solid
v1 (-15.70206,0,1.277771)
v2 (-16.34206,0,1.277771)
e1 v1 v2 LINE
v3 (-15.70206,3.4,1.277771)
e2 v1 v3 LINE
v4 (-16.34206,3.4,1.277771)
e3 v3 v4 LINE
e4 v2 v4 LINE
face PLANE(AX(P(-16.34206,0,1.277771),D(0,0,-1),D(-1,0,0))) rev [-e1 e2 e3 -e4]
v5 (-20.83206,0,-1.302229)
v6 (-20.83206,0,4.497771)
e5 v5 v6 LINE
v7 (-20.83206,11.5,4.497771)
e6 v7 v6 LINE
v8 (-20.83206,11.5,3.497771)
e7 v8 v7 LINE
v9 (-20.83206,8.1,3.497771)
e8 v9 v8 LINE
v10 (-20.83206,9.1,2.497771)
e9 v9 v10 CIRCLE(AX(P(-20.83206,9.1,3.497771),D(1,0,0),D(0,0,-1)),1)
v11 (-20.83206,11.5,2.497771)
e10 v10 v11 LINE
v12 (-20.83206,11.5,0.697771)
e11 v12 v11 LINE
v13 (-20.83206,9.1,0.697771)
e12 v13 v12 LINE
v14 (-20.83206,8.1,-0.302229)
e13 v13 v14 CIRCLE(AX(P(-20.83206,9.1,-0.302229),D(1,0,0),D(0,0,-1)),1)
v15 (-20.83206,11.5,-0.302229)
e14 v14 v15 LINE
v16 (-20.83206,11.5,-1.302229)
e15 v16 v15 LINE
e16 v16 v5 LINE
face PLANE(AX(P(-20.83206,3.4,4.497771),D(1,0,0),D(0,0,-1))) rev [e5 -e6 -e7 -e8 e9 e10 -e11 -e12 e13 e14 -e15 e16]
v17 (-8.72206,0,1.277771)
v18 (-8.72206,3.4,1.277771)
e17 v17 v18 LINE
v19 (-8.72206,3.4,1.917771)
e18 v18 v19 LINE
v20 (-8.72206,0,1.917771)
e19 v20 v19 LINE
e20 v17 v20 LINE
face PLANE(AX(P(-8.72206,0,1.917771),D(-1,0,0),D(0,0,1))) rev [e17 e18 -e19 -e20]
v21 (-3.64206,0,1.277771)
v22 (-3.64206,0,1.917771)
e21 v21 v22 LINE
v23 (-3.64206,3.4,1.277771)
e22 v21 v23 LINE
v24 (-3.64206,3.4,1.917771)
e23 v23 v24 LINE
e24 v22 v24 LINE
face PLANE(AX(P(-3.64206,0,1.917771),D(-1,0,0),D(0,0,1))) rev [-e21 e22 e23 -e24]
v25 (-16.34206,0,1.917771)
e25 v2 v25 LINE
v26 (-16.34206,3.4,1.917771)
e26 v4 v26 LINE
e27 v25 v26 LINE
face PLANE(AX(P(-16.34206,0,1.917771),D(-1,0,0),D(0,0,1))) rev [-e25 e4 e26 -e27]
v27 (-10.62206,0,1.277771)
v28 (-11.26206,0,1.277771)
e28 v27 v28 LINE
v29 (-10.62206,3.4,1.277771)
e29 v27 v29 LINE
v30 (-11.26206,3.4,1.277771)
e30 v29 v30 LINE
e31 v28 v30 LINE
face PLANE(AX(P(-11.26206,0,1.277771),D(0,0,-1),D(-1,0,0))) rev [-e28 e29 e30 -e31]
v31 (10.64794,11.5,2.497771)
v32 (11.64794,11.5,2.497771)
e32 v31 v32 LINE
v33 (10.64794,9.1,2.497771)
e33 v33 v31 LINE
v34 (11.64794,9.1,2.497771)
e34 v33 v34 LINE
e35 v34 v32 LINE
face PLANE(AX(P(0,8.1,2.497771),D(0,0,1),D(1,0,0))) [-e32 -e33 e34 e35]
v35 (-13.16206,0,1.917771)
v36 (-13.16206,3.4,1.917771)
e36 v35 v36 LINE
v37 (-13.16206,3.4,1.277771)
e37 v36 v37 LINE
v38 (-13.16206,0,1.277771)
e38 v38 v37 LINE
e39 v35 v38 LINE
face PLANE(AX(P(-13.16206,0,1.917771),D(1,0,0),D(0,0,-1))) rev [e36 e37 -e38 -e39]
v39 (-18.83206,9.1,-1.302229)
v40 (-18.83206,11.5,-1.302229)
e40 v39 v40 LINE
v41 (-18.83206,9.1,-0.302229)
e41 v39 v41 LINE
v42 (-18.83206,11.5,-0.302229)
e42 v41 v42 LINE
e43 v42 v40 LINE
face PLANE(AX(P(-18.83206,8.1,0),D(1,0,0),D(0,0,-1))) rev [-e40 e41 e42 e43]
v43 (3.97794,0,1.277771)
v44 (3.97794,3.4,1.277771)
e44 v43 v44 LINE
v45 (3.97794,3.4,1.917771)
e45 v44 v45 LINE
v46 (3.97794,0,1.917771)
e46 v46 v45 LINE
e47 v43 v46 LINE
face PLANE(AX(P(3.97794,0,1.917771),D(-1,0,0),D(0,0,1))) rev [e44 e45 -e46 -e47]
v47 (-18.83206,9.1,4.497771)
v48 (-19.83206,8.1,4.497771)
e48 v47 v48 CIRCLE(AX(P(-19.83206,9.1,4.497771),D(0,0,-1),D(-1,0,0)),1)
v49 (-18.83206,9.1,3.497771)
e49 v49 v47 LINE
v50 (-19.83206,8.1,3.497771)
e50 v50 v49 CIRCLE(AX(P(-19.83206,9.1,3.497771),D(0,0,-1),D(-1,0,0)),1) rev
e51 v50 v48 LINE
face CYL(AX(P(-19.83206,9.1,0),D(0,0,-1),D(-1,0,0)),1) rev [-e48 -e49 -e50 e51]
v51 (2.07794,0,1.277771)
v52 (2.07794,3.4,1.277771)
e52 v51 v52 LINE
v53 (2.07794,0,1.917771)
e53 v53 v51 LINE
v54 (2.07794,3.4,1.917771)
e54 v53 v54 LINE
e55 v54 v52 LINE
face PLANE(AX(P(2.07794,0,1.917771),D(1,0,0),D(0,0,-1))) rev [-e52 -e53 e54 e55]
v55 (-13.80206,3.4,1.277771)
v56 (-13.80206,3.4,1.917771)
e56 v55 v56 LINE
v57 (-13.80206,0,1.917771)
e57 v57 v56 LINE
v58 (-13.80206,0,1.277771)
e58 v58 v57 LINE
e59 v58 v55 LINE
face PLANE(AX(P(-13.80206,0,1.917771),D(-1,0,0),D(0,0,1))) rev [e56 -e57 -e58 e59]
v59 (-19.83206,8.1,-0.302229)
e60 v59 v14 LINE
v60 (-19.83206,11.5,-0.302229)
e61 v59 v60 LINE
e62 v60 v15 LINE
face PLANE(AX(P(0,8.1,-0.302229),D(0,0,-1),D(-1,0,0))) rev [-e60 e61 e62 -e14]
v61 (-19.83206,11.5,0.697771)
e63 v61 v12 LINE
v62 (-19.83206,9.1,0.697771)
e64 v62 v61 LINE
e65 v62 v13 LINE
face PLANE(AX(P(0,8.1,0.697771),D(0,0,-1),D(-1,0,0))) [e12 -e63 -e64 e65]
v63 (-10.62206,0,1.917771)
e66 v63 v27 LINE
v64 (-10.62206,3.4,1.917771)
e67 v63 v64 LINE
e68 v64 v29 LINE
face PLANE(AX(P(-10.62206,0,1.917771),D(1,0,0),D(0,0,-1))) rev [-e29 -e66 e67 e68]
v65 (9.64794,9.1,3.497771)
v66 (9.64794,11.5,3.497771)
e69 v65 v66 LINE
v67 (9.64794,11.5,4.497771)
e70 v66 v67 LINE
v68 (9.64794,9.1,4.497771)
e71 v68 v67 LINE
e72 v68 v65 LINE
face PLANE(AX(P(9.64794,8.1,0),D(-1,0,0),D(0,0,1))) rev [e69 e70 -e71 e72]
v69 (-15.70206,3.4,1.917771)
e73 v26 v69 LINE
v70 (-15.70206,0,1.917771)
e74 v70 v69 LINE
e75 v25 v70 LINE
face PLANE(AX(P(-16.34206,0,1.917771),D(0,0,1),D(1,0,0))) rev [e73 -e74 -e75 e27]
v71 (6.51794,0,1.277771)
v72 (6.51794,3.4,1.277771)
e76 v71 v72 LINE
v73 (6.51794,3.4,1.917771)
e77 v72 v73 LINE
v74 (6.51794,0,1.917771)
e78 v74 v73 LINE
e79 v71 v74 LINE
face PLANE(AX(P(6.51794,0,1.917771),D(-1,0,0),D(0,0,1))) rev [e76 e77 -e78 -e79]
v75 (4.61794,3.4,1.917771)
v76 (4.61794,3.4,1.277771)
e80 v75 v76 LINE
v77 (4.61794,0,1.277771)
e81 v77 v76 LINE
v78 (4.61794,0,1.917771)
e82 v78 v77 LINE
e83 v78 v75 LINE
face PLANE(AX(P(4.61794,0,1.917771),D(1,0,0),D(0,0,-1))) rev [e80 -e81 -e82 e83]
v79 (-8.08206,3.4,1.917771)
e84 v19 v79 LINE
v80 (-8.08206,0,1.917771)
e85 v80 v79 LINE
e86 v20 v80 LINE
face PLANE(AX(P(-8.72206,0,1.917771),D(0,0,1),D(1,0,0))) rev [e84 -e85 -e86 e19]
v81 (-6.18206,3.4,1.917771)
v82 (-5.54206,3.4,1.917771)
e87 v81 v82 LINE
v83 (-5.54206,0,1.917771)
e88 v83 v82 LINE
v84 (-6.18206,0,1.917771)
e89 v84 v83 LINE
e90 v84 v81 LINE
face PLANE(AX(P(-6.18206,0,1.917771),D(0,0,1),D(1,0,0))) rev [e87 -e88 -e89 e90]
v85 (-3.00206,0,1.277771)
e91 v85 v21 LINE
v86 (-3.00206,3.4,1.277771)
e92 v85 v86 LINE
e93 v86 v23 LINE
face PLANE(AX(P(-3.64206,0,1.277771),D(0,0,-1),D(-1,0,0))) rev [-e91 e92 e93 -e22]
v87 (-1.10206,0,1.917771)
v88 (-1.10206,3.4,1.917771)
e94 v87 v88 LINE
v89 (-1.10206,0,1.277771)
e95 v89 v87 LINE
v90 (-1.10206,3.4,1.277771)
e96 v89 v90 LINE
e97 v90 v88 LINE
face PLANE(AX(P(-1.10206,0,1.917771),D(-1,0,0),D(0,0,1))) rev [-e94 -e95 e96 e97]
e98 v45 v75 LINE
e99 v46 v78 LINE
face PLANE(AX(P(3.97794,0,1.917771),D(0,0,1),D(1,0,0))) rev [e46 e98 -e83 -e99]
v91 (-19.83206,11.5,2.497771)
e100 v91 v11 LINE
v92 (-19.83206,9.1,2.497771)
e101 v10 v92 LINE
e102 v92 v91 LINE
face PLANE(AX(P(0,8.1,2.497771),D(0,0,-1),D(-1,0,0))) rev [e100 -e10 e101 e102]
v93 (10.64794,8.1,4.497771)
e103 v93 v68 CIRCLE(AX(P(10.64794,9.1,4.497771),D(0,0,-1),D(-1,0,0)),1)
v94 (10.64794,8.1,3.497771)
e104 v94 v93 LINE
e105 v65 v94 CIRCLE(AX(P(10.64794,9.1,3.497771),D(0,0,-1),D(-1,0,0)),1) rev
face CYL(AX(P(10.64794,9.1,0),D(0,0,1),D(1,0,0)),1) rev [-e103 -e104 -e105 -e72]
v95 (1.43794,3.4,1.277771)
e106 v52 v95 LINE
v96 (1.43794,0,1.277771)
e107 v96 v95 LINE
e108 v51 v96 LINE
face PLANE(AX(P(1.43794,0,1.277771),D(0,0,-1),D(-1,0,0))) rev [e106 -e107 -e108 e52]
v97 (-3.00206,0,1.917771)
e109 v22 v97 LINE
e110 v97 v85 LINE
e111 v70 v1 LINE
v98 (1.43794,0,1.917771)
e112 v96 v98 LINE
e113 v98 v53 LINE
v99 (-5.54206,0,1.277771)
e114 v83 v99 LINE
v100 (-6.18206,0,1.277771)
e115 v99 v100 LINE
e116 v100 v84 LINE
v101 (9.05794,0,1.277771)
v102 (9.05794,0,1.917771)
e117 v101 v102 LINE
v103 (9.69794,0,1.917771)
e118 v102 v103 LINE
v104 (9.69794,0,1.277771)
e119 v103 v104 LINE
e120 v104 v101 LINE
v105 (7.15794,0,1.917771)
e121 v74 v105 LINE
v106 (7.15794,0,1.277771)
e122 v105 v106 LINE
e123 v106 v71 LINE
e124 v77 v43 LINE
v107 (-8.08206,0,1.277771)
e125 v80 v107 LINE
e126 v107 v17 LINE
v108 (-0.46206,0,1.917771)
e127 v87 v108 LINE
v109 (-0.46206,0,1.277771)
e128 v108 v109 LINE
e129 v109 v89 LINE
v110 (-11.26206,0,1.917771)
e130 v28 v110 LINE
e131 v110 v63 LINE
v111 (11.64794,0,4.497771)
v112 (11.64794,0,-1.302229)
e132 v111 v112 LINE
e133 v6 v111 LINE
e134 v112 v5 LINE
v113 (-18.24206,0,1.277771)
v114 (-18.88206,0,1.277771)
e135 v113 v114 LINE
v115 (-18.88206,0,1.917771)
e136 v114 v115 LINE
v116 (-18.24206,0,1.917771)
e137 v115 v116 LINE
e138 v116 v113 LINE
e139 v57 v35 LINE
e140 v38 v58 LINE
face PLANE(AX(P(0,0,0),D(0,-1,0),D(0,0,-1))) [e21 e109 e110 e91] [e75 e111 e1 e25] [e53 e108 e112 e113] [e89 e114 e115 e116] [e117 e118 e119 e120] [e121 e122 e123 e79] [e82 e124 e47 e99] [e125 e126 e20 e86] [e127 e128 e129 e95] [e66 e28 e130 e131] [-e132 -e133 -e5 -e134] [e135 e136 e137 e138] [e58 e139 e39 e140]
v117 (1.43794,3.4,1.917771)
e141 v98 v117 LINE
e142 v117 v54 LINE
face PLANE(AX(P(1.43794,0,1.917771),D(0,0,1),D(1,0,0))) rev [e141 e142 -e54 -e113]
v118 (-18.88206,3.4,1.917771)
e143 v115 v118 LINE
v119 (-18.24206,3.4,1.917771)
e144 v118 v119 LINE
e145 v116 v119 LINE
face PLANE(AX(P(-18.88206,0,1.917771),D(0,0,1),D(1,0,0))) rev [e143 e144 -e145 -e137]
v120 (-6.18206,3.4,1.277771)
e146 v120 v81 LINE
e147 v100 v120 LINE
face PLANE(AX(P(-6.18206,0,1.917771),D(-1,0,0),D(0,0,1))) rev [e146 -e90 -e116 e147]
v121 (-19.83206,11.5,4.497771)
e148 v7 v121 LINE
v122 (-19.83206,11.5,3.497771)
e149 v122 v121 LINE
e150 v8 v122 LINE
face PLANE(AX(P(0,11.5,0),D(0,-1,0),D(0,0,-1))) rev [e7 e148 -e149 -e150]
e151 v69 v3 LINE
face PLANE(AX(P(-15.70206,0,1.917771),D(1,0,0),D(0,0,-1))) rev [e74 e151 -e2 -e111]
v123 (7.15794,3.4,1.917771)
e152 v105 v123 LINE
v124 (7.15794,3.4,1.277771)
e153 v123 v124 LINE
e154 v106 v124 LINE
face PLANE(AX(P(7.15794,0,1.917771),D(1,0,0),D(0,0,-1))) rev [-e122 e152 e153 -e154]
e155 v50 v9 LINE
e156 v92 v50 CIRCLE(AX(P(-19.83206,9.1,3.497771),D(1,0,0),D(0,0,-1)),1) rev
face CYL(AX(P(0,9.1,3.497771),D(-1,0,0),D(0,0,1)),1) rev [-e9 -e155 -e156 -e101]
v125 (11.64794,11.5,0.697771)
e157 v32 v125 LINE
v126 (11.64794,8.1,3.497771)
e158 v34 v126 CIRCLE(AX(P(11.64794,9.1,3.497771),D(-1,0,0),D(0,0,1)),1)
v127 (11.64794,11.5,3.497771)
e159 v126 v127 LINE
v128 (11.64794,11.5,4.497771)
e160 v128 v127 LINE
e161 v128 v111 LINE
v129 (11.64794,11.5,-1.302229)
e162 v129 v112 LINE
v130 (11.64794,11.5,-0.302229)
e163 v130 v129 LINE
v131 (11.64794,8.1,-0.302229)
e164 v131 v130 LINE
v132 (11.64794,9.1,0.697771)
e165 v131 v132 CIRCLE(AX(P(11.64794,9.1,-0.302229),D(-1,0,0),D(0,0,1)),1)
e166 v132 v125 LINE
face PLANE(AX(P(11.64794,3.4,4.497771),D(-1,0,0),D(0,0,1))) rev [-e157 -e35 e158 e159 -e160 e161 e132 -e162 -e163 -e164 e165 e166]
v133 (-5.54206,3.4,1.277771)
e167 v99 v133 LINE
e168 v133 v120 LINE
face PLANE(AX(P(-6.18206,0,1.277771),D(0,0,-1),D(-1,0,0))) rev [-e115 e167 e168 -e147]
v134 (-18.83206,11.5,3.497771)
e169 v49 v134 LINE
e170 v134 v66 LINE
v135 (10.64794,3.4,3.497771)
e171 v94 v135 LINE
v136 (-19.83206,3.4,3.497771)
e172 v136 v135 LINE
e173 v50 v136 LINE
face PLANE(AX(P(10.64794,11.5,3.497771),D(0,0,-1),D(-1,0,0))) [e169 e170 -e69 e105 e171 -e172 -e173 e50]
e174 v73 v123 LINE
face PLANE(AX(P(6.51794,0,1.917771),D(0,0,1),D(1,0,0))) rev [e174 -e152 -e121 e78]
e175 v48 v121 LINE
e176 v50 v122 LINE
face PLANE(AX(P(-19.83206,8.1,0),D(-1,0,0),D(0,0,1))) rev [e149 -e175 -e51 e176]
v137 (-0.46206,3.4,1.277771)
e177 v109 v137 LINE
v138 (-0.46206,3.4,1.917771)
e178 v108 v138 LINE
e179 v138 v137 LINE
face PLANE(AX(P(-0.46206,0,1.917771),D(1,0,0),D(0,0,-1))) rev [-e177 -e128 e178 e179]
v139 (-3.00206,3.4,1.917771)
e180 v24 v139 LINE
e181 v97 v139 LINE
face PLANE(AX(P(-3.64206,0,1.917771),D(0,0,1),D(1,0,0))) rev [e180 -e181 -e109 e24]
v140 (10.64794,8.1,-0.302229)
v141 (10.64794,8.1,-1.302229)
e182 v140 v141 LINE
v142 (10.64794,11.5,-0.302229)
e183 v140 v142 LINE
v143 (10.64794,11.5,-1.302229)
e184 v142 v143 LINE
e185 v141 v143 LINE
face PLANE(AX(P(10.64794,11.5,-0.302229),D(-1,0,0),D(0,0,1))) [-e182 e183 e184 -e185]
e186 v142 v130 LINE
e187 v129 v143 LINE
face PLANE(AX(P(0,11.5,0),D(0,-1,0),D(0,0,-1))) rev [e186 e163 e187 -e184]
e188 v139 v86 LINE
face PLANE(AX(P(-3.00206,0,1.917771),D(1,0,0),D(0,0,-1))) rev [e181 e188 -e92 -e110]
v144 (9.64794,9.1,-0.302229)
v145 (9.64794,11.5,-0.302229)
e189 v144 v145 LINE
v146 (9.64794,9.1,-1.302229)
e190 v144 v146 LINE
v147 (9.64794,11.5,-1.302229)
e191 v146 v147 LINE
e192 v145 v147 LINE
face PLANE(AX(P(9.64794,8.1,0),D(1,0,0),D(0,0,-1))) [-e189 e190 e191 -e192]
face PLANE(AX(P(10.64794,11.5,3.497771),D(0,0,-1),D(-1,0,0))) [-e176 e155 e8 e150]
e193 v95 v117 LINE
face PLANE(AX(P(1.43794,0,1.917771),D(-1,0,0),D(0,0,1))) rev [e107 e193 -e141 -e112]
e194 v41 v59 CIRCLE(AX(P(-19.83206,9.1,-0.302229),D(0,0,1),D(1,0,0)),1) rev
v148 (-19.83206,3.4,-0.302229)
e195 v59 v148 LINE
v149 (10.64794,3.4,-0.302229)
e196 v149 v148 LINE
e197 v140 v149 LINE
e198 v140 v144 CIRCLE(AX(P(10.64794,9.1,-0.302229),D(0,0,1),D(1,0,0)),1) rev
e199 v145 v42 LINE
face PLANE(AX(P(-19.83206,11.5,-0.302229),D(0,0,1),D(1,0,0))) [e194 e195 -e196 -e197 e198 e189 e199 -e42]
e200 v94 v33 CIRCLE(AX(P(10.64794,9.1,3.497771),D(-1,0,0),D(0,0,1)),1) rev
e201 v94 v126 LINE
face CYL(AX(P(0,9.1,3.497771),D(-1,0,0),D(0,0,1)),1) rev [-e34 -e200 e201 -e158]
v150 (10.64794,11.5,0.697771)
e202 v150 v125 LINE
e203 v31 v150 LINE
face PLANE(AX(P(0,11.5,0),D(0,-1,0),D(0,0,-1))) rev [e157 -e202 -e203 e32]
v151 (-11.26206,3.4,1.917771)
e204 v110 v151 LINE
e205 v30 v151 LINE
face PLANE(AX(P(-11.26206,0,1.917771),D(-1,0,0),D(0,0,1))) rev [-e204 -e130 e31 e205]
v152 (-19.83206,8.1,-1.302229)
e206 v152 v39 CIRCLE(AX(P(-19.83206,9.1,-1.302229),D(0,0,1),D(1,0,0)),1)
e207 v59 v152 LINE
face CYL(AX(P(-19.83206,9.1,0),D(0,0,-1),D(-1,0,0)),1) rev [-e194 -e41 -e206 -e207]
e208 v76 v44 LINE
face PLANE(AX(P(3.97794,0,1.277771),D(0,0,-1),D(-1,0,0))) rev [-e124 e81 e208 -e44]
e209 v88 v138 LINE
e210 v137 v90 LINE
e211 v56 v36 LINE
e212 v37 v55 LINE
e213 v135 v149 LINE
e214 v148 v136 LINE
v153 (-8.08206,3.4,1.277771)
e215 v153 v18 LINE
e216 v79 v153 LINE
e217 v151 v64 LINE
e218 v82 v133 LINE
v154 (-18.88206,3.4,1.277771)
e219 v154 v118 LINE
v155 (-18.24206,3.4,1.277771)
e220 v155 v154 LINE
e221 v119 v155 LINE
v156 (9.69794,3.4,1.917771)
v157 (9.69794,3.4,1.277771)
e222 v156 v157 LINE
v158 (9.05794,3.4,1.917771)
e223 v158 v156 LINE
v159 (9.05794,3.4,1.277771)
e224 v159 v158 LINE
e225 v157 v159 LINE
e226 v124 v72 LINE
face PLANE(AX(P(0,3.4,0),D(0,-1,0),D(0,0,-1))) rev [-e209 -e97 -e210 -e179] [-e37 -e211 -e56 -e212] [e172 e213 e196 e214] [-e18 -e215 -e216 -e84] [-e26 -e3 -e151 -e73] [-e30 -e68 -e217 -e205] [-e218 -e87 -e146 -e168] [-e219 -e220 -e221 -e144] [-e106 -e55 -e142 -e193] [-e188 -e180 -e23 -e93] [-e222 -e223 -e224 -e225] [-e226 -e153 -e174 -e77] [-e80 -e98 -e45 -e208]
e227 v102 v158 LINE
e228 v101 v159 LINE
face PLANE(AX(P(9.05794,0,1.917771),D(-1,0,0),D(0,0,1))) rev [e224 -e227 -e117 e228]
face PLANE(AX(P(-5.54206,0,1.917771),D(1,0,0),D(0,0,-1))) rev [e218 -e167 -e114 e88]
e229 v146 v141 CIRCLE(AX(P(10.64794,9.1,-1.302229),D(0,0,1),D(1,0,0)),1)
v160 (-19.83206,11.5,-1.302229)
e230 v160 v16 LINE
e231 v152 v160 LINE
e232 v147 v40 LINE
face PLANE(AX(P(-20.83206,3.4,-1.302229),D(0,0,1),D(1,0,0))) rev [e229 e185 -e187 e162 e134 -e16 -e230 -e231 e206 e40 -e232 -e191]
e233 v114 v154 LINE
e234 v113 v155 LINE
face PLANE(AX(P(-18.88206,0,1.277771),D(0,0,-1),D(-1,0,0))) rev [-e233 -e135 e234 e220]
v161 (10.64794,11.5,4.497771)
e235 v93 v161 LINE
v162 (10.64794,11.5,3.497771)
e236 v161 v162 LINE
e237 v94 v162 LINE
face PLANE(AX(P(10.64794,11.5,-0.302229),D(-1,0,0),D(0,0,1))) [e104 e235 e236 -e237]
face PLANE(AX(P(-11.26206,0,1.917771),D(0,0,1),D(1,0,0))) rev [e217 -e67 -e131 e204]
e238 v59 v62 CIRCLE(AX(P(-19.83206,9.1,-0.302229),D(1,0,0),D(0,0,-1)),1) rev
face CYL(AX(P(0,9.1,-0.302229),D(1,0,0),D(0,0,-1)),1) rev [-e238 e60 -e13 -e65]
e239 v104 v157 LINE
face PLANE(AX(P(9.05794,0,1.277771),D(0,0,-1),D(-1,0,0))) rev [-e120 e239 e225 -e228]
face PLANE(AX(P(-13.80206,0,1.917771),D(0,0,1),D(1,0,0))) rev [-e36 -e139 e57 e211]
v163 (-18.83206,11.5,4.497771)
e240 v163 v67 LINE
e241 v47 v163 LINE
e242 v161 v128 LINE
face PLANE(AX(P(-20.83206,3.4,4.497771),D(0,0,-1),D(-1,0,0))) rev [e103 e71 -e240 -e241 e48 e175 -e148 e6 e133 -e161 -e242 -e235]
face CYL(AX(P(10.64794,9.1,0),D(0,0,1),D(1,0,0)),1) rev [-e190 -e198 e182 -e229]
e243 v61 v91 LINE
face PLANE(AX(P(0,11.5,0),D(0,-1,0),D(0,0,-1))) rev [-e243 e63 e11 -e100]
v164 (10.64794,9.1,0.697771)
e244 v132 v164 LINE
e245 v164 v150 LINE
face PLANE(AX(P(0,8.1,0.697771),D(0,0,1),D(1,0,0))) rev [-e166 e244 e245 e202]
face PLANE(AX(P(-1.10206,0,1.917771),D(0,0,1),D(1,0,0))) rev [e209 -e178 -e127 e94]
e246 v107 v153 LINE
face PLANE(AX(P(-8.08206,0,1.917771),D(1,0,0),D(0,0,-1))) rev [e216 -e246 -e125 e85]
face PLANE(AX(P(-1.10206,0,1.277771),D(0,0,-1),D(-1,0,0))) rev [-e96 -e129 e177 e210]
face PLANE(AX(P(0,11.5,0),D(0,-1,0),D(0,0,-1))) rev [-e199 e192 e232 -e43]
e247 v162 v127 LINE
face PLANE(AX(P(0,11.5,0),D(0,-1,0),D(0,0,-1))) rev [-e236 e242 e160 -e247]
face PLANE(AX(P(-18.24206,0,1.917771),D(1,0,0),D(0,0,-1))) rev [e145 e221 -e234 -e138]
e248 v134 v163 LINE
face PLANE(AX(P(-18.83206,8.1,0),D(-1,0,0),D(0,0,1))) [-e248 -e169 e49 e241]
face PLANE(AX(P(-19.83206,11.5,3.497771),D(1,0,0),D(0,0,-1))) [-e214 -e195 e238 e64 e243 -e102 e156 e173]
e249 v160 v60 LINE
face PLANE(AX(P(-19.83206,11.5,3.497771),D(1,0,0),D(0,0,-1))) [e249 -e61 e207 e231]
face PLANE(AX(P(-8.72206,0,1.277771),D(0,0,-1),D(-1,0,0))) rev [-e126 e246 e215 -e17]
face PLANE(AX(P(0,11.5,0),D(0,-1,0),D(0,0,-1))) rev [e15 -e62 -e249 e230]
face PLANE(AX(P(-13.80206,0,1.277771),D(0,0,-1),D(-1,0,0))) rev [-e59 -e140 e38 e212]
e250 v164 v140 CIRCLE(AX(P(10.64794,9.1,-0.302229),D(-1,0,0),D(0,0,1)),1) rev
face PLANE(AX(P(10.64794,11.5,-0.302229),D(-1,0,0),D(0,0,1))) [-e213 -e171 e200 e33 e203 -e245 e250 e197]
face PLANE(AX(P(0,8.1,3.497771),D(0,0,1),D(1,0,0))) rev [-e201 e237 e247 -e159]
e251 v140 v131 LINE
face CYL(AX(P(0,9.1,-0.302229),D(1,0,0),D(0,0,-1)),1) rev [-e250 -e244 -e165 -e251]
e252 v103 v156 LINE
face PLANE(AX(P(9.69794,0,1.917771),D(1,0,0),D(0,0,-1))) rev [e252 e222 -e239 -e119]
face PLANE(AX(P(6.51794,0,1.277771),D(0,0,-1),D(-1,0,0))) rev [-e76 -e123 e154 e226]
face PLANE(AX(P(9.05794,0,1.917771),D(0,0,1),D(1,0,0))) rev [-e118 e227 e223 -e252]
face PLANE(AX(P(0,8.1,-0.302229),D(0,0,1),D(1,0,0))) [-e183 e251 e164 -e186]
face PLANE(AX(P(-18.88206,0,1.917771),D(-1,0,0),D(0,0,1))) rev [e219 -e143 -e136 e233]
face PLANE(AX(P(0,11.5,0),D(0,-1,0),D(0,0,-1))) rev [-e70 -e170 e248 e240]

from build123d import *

# Parameters (mm, degrees)
SZKIC1_W                    = 32.48
SZKIC1_H                    = 5.8
DODANIE_WYCI_GNI_CIE1_DEPTH = 3.4
SZKIC2_W                    = 0.64
SZKIC2_H                    = 0.64
WYTNIJ_WYCI_GNI_CIE1_DEPTH  = 3.4
SZKIC3_W                    = 32.48
SZKIC3_H                    = 5.8
SZKIC3_W_2                  = 30.48
SZKIC3_H_2                  = 3.8
DODANIE_WYCI_GNI_CIE2_DEPTH = 8.1
SZKIC4_W                    = 1
SZKIC4_H                    = 1
WYTNIJ_WYCI_GNI_CIE2_DEPTH  = 3.4
ZAOKR_GLENIE1_R             = 1


with BuildPart() as part:
    # Szkic1 → Dodanie-wyciągnięcie1 (new body)
    with BuildSketch(Plane(origin=(0, 0, 0), x_dir=(1, 0, 0), z_dir=(0, 1, 0))):
        with Locations((-4.592060125, -1.597771029)):
            Rectangle(SZKIC1_W, SZKIC1_H)
    extrude(amount=DODANIE_WYCI_GNI_CIE1_DEPTH)

    # Szkic2 → Wytnij-wyciągnięcie1 (cut)
    with BuildSketch(Plane(origin=(0, 3.4, 0), x_dir=(1, 0, 0), z_dir=(0, 1, 0))):
        with Locations((-18.562060125, -1.597771029)):
            Rectangle(SZKIC2_W, SZKIC2_H)
        with Locations((-16.022060125, -1.597771029)):
            Rectangle(SZKIC2_W, SZKIC2_H)
        with Locations((-13.482060125, -1.597771029)):
            Rectangle(SZKIC2_W, SZKIC2_H)
        with Locations((-10.942060125, -1.597771029)):
            Rectangle(SZKIC2_W, SZKIC2_H)
        with Locations((-8.402060125, -1.597771029)):
            Rectangle(SZKIC2_W, SZKIC2_H)
        with Locations((-5.862060125, -1.597771029)):
            Rectangle(SZKIC2_W, SZKIC2_H)
        with Locations((-3.322060125, -1.597771029)):
            Rectangle(SZKIC2_W, SZKIC2_H)
        with Locations((-0.782060125, -1.597771029)):
            Rectangle(SZKIC2_W, SZKIC2_H)
        with Locations((1.757939875, -1.597771029)):
            Rectangle(SZKIC2_W, SZKIC2_H)
        with Locations((4.297939875, -1.597771029)):
            Rectangle(SZKIC2_W, SZKIC2_H)
        with Locations((6.837939875, -1.597771029)):
            Rectangle(SZKIC2_W, SZKIC2_H)
        with Locations((9.377939875, -1.597771029)):
            Rectangle(SZKIC2_W, SZKIC2_H)
    extrude(amount=-WYTNIJ_WYCI_GNI_CIE1_DEPTH, mode=Mode.SUBTRACT)

    # Szkic3 → Dodanie-wyciągnięcie2 (add)
    with BuildSketch(Plane(origin=(0, 3.4, 0), x_dir=(1, 0, 0), z_dir=(0, 1, 0))):
        with Locations((-4.592060125, -1.597771029)):
            Rectangle(SZKIC3_W, SZKIC3_H)
        with Locations((-4.592060125, -1.597771029)):
            Rectangle(SZKIC3_W_2, SZKIC3_H_2, mode=Mode.SUBTRACT)
    extrude(amount=DODANIE_WYCI_GNI_CIE2_DEPTH)

    # Szkic4 → Wytnij-wyciągnięcie2 (cut)
    with BuildSketch(Plane(origin=(0, 11.5, 0), x_dir=(1, 0, 0), z_dir=(0, 1, 0))):
        with Locations((-20.332060125, -2.997771029)):
            Rectangle(SZKIC4_W, SZKIC4_H)
        with Locations((-19.332060125, -3.997771029)):
            Rectangle(SZKIC4_W, SZKIC4_H)
        with Locations((-20.332060125, -0.197771029)):
            Rectangle(SZKIC4_W, SZKIC4_H)
        with Locations((-19.332060125, 0.802228971)):
            Rectangle(SZKIC4_W, SZKIC4_H)
        with Locations((10.147939875, 0.802228971)):
            Rectangle(SZKIC4_W, SZKIC4_H)
        with Locations((11.147939875, -0.197771029)):
            Rectangle(SZKIC4_W, SZKIC4_H)
        with Locations((11.147939875, -2.997771029)):
            Rectangle(SZKIC4_W, SZKIC4_H)
        with Locations((10.147939875, -3.997771029)):
            Rectangle(SZKIC4_W, SZKIC4_H)
    extrude(amount=-WYTNIJ_WYCI_GNI_CIE2_DEPTH, mode=Mode.SUBTRACT)

    # Zaokrąglenie1
    zaokr_glenie1_edges = [part.edges().sort_by_distance(p)[0] for p in [
        (11.147939875, 8.1, 2.497771029),
        (11.147939875, 8.1, 0.697771029),
        (9.647939875, 8.1, -0.802228971),
        (9.647939875, 8.1, 3.997771029),
        (-18.832060125, 8.1, -0.802228971),
        (-20.332060125, 8.1, 0.697771029),
        (-20.332060125, 8.1, 2.497771029),
        (-18.832060125, 8.1, 3.997771029),
    ]]
    fillet(zaokr_glenie1_edges, radius=ZAOKR_GLENIE1_R - 0.0001)  # a hair under: the kernel refuses the full size


solid = part.part
